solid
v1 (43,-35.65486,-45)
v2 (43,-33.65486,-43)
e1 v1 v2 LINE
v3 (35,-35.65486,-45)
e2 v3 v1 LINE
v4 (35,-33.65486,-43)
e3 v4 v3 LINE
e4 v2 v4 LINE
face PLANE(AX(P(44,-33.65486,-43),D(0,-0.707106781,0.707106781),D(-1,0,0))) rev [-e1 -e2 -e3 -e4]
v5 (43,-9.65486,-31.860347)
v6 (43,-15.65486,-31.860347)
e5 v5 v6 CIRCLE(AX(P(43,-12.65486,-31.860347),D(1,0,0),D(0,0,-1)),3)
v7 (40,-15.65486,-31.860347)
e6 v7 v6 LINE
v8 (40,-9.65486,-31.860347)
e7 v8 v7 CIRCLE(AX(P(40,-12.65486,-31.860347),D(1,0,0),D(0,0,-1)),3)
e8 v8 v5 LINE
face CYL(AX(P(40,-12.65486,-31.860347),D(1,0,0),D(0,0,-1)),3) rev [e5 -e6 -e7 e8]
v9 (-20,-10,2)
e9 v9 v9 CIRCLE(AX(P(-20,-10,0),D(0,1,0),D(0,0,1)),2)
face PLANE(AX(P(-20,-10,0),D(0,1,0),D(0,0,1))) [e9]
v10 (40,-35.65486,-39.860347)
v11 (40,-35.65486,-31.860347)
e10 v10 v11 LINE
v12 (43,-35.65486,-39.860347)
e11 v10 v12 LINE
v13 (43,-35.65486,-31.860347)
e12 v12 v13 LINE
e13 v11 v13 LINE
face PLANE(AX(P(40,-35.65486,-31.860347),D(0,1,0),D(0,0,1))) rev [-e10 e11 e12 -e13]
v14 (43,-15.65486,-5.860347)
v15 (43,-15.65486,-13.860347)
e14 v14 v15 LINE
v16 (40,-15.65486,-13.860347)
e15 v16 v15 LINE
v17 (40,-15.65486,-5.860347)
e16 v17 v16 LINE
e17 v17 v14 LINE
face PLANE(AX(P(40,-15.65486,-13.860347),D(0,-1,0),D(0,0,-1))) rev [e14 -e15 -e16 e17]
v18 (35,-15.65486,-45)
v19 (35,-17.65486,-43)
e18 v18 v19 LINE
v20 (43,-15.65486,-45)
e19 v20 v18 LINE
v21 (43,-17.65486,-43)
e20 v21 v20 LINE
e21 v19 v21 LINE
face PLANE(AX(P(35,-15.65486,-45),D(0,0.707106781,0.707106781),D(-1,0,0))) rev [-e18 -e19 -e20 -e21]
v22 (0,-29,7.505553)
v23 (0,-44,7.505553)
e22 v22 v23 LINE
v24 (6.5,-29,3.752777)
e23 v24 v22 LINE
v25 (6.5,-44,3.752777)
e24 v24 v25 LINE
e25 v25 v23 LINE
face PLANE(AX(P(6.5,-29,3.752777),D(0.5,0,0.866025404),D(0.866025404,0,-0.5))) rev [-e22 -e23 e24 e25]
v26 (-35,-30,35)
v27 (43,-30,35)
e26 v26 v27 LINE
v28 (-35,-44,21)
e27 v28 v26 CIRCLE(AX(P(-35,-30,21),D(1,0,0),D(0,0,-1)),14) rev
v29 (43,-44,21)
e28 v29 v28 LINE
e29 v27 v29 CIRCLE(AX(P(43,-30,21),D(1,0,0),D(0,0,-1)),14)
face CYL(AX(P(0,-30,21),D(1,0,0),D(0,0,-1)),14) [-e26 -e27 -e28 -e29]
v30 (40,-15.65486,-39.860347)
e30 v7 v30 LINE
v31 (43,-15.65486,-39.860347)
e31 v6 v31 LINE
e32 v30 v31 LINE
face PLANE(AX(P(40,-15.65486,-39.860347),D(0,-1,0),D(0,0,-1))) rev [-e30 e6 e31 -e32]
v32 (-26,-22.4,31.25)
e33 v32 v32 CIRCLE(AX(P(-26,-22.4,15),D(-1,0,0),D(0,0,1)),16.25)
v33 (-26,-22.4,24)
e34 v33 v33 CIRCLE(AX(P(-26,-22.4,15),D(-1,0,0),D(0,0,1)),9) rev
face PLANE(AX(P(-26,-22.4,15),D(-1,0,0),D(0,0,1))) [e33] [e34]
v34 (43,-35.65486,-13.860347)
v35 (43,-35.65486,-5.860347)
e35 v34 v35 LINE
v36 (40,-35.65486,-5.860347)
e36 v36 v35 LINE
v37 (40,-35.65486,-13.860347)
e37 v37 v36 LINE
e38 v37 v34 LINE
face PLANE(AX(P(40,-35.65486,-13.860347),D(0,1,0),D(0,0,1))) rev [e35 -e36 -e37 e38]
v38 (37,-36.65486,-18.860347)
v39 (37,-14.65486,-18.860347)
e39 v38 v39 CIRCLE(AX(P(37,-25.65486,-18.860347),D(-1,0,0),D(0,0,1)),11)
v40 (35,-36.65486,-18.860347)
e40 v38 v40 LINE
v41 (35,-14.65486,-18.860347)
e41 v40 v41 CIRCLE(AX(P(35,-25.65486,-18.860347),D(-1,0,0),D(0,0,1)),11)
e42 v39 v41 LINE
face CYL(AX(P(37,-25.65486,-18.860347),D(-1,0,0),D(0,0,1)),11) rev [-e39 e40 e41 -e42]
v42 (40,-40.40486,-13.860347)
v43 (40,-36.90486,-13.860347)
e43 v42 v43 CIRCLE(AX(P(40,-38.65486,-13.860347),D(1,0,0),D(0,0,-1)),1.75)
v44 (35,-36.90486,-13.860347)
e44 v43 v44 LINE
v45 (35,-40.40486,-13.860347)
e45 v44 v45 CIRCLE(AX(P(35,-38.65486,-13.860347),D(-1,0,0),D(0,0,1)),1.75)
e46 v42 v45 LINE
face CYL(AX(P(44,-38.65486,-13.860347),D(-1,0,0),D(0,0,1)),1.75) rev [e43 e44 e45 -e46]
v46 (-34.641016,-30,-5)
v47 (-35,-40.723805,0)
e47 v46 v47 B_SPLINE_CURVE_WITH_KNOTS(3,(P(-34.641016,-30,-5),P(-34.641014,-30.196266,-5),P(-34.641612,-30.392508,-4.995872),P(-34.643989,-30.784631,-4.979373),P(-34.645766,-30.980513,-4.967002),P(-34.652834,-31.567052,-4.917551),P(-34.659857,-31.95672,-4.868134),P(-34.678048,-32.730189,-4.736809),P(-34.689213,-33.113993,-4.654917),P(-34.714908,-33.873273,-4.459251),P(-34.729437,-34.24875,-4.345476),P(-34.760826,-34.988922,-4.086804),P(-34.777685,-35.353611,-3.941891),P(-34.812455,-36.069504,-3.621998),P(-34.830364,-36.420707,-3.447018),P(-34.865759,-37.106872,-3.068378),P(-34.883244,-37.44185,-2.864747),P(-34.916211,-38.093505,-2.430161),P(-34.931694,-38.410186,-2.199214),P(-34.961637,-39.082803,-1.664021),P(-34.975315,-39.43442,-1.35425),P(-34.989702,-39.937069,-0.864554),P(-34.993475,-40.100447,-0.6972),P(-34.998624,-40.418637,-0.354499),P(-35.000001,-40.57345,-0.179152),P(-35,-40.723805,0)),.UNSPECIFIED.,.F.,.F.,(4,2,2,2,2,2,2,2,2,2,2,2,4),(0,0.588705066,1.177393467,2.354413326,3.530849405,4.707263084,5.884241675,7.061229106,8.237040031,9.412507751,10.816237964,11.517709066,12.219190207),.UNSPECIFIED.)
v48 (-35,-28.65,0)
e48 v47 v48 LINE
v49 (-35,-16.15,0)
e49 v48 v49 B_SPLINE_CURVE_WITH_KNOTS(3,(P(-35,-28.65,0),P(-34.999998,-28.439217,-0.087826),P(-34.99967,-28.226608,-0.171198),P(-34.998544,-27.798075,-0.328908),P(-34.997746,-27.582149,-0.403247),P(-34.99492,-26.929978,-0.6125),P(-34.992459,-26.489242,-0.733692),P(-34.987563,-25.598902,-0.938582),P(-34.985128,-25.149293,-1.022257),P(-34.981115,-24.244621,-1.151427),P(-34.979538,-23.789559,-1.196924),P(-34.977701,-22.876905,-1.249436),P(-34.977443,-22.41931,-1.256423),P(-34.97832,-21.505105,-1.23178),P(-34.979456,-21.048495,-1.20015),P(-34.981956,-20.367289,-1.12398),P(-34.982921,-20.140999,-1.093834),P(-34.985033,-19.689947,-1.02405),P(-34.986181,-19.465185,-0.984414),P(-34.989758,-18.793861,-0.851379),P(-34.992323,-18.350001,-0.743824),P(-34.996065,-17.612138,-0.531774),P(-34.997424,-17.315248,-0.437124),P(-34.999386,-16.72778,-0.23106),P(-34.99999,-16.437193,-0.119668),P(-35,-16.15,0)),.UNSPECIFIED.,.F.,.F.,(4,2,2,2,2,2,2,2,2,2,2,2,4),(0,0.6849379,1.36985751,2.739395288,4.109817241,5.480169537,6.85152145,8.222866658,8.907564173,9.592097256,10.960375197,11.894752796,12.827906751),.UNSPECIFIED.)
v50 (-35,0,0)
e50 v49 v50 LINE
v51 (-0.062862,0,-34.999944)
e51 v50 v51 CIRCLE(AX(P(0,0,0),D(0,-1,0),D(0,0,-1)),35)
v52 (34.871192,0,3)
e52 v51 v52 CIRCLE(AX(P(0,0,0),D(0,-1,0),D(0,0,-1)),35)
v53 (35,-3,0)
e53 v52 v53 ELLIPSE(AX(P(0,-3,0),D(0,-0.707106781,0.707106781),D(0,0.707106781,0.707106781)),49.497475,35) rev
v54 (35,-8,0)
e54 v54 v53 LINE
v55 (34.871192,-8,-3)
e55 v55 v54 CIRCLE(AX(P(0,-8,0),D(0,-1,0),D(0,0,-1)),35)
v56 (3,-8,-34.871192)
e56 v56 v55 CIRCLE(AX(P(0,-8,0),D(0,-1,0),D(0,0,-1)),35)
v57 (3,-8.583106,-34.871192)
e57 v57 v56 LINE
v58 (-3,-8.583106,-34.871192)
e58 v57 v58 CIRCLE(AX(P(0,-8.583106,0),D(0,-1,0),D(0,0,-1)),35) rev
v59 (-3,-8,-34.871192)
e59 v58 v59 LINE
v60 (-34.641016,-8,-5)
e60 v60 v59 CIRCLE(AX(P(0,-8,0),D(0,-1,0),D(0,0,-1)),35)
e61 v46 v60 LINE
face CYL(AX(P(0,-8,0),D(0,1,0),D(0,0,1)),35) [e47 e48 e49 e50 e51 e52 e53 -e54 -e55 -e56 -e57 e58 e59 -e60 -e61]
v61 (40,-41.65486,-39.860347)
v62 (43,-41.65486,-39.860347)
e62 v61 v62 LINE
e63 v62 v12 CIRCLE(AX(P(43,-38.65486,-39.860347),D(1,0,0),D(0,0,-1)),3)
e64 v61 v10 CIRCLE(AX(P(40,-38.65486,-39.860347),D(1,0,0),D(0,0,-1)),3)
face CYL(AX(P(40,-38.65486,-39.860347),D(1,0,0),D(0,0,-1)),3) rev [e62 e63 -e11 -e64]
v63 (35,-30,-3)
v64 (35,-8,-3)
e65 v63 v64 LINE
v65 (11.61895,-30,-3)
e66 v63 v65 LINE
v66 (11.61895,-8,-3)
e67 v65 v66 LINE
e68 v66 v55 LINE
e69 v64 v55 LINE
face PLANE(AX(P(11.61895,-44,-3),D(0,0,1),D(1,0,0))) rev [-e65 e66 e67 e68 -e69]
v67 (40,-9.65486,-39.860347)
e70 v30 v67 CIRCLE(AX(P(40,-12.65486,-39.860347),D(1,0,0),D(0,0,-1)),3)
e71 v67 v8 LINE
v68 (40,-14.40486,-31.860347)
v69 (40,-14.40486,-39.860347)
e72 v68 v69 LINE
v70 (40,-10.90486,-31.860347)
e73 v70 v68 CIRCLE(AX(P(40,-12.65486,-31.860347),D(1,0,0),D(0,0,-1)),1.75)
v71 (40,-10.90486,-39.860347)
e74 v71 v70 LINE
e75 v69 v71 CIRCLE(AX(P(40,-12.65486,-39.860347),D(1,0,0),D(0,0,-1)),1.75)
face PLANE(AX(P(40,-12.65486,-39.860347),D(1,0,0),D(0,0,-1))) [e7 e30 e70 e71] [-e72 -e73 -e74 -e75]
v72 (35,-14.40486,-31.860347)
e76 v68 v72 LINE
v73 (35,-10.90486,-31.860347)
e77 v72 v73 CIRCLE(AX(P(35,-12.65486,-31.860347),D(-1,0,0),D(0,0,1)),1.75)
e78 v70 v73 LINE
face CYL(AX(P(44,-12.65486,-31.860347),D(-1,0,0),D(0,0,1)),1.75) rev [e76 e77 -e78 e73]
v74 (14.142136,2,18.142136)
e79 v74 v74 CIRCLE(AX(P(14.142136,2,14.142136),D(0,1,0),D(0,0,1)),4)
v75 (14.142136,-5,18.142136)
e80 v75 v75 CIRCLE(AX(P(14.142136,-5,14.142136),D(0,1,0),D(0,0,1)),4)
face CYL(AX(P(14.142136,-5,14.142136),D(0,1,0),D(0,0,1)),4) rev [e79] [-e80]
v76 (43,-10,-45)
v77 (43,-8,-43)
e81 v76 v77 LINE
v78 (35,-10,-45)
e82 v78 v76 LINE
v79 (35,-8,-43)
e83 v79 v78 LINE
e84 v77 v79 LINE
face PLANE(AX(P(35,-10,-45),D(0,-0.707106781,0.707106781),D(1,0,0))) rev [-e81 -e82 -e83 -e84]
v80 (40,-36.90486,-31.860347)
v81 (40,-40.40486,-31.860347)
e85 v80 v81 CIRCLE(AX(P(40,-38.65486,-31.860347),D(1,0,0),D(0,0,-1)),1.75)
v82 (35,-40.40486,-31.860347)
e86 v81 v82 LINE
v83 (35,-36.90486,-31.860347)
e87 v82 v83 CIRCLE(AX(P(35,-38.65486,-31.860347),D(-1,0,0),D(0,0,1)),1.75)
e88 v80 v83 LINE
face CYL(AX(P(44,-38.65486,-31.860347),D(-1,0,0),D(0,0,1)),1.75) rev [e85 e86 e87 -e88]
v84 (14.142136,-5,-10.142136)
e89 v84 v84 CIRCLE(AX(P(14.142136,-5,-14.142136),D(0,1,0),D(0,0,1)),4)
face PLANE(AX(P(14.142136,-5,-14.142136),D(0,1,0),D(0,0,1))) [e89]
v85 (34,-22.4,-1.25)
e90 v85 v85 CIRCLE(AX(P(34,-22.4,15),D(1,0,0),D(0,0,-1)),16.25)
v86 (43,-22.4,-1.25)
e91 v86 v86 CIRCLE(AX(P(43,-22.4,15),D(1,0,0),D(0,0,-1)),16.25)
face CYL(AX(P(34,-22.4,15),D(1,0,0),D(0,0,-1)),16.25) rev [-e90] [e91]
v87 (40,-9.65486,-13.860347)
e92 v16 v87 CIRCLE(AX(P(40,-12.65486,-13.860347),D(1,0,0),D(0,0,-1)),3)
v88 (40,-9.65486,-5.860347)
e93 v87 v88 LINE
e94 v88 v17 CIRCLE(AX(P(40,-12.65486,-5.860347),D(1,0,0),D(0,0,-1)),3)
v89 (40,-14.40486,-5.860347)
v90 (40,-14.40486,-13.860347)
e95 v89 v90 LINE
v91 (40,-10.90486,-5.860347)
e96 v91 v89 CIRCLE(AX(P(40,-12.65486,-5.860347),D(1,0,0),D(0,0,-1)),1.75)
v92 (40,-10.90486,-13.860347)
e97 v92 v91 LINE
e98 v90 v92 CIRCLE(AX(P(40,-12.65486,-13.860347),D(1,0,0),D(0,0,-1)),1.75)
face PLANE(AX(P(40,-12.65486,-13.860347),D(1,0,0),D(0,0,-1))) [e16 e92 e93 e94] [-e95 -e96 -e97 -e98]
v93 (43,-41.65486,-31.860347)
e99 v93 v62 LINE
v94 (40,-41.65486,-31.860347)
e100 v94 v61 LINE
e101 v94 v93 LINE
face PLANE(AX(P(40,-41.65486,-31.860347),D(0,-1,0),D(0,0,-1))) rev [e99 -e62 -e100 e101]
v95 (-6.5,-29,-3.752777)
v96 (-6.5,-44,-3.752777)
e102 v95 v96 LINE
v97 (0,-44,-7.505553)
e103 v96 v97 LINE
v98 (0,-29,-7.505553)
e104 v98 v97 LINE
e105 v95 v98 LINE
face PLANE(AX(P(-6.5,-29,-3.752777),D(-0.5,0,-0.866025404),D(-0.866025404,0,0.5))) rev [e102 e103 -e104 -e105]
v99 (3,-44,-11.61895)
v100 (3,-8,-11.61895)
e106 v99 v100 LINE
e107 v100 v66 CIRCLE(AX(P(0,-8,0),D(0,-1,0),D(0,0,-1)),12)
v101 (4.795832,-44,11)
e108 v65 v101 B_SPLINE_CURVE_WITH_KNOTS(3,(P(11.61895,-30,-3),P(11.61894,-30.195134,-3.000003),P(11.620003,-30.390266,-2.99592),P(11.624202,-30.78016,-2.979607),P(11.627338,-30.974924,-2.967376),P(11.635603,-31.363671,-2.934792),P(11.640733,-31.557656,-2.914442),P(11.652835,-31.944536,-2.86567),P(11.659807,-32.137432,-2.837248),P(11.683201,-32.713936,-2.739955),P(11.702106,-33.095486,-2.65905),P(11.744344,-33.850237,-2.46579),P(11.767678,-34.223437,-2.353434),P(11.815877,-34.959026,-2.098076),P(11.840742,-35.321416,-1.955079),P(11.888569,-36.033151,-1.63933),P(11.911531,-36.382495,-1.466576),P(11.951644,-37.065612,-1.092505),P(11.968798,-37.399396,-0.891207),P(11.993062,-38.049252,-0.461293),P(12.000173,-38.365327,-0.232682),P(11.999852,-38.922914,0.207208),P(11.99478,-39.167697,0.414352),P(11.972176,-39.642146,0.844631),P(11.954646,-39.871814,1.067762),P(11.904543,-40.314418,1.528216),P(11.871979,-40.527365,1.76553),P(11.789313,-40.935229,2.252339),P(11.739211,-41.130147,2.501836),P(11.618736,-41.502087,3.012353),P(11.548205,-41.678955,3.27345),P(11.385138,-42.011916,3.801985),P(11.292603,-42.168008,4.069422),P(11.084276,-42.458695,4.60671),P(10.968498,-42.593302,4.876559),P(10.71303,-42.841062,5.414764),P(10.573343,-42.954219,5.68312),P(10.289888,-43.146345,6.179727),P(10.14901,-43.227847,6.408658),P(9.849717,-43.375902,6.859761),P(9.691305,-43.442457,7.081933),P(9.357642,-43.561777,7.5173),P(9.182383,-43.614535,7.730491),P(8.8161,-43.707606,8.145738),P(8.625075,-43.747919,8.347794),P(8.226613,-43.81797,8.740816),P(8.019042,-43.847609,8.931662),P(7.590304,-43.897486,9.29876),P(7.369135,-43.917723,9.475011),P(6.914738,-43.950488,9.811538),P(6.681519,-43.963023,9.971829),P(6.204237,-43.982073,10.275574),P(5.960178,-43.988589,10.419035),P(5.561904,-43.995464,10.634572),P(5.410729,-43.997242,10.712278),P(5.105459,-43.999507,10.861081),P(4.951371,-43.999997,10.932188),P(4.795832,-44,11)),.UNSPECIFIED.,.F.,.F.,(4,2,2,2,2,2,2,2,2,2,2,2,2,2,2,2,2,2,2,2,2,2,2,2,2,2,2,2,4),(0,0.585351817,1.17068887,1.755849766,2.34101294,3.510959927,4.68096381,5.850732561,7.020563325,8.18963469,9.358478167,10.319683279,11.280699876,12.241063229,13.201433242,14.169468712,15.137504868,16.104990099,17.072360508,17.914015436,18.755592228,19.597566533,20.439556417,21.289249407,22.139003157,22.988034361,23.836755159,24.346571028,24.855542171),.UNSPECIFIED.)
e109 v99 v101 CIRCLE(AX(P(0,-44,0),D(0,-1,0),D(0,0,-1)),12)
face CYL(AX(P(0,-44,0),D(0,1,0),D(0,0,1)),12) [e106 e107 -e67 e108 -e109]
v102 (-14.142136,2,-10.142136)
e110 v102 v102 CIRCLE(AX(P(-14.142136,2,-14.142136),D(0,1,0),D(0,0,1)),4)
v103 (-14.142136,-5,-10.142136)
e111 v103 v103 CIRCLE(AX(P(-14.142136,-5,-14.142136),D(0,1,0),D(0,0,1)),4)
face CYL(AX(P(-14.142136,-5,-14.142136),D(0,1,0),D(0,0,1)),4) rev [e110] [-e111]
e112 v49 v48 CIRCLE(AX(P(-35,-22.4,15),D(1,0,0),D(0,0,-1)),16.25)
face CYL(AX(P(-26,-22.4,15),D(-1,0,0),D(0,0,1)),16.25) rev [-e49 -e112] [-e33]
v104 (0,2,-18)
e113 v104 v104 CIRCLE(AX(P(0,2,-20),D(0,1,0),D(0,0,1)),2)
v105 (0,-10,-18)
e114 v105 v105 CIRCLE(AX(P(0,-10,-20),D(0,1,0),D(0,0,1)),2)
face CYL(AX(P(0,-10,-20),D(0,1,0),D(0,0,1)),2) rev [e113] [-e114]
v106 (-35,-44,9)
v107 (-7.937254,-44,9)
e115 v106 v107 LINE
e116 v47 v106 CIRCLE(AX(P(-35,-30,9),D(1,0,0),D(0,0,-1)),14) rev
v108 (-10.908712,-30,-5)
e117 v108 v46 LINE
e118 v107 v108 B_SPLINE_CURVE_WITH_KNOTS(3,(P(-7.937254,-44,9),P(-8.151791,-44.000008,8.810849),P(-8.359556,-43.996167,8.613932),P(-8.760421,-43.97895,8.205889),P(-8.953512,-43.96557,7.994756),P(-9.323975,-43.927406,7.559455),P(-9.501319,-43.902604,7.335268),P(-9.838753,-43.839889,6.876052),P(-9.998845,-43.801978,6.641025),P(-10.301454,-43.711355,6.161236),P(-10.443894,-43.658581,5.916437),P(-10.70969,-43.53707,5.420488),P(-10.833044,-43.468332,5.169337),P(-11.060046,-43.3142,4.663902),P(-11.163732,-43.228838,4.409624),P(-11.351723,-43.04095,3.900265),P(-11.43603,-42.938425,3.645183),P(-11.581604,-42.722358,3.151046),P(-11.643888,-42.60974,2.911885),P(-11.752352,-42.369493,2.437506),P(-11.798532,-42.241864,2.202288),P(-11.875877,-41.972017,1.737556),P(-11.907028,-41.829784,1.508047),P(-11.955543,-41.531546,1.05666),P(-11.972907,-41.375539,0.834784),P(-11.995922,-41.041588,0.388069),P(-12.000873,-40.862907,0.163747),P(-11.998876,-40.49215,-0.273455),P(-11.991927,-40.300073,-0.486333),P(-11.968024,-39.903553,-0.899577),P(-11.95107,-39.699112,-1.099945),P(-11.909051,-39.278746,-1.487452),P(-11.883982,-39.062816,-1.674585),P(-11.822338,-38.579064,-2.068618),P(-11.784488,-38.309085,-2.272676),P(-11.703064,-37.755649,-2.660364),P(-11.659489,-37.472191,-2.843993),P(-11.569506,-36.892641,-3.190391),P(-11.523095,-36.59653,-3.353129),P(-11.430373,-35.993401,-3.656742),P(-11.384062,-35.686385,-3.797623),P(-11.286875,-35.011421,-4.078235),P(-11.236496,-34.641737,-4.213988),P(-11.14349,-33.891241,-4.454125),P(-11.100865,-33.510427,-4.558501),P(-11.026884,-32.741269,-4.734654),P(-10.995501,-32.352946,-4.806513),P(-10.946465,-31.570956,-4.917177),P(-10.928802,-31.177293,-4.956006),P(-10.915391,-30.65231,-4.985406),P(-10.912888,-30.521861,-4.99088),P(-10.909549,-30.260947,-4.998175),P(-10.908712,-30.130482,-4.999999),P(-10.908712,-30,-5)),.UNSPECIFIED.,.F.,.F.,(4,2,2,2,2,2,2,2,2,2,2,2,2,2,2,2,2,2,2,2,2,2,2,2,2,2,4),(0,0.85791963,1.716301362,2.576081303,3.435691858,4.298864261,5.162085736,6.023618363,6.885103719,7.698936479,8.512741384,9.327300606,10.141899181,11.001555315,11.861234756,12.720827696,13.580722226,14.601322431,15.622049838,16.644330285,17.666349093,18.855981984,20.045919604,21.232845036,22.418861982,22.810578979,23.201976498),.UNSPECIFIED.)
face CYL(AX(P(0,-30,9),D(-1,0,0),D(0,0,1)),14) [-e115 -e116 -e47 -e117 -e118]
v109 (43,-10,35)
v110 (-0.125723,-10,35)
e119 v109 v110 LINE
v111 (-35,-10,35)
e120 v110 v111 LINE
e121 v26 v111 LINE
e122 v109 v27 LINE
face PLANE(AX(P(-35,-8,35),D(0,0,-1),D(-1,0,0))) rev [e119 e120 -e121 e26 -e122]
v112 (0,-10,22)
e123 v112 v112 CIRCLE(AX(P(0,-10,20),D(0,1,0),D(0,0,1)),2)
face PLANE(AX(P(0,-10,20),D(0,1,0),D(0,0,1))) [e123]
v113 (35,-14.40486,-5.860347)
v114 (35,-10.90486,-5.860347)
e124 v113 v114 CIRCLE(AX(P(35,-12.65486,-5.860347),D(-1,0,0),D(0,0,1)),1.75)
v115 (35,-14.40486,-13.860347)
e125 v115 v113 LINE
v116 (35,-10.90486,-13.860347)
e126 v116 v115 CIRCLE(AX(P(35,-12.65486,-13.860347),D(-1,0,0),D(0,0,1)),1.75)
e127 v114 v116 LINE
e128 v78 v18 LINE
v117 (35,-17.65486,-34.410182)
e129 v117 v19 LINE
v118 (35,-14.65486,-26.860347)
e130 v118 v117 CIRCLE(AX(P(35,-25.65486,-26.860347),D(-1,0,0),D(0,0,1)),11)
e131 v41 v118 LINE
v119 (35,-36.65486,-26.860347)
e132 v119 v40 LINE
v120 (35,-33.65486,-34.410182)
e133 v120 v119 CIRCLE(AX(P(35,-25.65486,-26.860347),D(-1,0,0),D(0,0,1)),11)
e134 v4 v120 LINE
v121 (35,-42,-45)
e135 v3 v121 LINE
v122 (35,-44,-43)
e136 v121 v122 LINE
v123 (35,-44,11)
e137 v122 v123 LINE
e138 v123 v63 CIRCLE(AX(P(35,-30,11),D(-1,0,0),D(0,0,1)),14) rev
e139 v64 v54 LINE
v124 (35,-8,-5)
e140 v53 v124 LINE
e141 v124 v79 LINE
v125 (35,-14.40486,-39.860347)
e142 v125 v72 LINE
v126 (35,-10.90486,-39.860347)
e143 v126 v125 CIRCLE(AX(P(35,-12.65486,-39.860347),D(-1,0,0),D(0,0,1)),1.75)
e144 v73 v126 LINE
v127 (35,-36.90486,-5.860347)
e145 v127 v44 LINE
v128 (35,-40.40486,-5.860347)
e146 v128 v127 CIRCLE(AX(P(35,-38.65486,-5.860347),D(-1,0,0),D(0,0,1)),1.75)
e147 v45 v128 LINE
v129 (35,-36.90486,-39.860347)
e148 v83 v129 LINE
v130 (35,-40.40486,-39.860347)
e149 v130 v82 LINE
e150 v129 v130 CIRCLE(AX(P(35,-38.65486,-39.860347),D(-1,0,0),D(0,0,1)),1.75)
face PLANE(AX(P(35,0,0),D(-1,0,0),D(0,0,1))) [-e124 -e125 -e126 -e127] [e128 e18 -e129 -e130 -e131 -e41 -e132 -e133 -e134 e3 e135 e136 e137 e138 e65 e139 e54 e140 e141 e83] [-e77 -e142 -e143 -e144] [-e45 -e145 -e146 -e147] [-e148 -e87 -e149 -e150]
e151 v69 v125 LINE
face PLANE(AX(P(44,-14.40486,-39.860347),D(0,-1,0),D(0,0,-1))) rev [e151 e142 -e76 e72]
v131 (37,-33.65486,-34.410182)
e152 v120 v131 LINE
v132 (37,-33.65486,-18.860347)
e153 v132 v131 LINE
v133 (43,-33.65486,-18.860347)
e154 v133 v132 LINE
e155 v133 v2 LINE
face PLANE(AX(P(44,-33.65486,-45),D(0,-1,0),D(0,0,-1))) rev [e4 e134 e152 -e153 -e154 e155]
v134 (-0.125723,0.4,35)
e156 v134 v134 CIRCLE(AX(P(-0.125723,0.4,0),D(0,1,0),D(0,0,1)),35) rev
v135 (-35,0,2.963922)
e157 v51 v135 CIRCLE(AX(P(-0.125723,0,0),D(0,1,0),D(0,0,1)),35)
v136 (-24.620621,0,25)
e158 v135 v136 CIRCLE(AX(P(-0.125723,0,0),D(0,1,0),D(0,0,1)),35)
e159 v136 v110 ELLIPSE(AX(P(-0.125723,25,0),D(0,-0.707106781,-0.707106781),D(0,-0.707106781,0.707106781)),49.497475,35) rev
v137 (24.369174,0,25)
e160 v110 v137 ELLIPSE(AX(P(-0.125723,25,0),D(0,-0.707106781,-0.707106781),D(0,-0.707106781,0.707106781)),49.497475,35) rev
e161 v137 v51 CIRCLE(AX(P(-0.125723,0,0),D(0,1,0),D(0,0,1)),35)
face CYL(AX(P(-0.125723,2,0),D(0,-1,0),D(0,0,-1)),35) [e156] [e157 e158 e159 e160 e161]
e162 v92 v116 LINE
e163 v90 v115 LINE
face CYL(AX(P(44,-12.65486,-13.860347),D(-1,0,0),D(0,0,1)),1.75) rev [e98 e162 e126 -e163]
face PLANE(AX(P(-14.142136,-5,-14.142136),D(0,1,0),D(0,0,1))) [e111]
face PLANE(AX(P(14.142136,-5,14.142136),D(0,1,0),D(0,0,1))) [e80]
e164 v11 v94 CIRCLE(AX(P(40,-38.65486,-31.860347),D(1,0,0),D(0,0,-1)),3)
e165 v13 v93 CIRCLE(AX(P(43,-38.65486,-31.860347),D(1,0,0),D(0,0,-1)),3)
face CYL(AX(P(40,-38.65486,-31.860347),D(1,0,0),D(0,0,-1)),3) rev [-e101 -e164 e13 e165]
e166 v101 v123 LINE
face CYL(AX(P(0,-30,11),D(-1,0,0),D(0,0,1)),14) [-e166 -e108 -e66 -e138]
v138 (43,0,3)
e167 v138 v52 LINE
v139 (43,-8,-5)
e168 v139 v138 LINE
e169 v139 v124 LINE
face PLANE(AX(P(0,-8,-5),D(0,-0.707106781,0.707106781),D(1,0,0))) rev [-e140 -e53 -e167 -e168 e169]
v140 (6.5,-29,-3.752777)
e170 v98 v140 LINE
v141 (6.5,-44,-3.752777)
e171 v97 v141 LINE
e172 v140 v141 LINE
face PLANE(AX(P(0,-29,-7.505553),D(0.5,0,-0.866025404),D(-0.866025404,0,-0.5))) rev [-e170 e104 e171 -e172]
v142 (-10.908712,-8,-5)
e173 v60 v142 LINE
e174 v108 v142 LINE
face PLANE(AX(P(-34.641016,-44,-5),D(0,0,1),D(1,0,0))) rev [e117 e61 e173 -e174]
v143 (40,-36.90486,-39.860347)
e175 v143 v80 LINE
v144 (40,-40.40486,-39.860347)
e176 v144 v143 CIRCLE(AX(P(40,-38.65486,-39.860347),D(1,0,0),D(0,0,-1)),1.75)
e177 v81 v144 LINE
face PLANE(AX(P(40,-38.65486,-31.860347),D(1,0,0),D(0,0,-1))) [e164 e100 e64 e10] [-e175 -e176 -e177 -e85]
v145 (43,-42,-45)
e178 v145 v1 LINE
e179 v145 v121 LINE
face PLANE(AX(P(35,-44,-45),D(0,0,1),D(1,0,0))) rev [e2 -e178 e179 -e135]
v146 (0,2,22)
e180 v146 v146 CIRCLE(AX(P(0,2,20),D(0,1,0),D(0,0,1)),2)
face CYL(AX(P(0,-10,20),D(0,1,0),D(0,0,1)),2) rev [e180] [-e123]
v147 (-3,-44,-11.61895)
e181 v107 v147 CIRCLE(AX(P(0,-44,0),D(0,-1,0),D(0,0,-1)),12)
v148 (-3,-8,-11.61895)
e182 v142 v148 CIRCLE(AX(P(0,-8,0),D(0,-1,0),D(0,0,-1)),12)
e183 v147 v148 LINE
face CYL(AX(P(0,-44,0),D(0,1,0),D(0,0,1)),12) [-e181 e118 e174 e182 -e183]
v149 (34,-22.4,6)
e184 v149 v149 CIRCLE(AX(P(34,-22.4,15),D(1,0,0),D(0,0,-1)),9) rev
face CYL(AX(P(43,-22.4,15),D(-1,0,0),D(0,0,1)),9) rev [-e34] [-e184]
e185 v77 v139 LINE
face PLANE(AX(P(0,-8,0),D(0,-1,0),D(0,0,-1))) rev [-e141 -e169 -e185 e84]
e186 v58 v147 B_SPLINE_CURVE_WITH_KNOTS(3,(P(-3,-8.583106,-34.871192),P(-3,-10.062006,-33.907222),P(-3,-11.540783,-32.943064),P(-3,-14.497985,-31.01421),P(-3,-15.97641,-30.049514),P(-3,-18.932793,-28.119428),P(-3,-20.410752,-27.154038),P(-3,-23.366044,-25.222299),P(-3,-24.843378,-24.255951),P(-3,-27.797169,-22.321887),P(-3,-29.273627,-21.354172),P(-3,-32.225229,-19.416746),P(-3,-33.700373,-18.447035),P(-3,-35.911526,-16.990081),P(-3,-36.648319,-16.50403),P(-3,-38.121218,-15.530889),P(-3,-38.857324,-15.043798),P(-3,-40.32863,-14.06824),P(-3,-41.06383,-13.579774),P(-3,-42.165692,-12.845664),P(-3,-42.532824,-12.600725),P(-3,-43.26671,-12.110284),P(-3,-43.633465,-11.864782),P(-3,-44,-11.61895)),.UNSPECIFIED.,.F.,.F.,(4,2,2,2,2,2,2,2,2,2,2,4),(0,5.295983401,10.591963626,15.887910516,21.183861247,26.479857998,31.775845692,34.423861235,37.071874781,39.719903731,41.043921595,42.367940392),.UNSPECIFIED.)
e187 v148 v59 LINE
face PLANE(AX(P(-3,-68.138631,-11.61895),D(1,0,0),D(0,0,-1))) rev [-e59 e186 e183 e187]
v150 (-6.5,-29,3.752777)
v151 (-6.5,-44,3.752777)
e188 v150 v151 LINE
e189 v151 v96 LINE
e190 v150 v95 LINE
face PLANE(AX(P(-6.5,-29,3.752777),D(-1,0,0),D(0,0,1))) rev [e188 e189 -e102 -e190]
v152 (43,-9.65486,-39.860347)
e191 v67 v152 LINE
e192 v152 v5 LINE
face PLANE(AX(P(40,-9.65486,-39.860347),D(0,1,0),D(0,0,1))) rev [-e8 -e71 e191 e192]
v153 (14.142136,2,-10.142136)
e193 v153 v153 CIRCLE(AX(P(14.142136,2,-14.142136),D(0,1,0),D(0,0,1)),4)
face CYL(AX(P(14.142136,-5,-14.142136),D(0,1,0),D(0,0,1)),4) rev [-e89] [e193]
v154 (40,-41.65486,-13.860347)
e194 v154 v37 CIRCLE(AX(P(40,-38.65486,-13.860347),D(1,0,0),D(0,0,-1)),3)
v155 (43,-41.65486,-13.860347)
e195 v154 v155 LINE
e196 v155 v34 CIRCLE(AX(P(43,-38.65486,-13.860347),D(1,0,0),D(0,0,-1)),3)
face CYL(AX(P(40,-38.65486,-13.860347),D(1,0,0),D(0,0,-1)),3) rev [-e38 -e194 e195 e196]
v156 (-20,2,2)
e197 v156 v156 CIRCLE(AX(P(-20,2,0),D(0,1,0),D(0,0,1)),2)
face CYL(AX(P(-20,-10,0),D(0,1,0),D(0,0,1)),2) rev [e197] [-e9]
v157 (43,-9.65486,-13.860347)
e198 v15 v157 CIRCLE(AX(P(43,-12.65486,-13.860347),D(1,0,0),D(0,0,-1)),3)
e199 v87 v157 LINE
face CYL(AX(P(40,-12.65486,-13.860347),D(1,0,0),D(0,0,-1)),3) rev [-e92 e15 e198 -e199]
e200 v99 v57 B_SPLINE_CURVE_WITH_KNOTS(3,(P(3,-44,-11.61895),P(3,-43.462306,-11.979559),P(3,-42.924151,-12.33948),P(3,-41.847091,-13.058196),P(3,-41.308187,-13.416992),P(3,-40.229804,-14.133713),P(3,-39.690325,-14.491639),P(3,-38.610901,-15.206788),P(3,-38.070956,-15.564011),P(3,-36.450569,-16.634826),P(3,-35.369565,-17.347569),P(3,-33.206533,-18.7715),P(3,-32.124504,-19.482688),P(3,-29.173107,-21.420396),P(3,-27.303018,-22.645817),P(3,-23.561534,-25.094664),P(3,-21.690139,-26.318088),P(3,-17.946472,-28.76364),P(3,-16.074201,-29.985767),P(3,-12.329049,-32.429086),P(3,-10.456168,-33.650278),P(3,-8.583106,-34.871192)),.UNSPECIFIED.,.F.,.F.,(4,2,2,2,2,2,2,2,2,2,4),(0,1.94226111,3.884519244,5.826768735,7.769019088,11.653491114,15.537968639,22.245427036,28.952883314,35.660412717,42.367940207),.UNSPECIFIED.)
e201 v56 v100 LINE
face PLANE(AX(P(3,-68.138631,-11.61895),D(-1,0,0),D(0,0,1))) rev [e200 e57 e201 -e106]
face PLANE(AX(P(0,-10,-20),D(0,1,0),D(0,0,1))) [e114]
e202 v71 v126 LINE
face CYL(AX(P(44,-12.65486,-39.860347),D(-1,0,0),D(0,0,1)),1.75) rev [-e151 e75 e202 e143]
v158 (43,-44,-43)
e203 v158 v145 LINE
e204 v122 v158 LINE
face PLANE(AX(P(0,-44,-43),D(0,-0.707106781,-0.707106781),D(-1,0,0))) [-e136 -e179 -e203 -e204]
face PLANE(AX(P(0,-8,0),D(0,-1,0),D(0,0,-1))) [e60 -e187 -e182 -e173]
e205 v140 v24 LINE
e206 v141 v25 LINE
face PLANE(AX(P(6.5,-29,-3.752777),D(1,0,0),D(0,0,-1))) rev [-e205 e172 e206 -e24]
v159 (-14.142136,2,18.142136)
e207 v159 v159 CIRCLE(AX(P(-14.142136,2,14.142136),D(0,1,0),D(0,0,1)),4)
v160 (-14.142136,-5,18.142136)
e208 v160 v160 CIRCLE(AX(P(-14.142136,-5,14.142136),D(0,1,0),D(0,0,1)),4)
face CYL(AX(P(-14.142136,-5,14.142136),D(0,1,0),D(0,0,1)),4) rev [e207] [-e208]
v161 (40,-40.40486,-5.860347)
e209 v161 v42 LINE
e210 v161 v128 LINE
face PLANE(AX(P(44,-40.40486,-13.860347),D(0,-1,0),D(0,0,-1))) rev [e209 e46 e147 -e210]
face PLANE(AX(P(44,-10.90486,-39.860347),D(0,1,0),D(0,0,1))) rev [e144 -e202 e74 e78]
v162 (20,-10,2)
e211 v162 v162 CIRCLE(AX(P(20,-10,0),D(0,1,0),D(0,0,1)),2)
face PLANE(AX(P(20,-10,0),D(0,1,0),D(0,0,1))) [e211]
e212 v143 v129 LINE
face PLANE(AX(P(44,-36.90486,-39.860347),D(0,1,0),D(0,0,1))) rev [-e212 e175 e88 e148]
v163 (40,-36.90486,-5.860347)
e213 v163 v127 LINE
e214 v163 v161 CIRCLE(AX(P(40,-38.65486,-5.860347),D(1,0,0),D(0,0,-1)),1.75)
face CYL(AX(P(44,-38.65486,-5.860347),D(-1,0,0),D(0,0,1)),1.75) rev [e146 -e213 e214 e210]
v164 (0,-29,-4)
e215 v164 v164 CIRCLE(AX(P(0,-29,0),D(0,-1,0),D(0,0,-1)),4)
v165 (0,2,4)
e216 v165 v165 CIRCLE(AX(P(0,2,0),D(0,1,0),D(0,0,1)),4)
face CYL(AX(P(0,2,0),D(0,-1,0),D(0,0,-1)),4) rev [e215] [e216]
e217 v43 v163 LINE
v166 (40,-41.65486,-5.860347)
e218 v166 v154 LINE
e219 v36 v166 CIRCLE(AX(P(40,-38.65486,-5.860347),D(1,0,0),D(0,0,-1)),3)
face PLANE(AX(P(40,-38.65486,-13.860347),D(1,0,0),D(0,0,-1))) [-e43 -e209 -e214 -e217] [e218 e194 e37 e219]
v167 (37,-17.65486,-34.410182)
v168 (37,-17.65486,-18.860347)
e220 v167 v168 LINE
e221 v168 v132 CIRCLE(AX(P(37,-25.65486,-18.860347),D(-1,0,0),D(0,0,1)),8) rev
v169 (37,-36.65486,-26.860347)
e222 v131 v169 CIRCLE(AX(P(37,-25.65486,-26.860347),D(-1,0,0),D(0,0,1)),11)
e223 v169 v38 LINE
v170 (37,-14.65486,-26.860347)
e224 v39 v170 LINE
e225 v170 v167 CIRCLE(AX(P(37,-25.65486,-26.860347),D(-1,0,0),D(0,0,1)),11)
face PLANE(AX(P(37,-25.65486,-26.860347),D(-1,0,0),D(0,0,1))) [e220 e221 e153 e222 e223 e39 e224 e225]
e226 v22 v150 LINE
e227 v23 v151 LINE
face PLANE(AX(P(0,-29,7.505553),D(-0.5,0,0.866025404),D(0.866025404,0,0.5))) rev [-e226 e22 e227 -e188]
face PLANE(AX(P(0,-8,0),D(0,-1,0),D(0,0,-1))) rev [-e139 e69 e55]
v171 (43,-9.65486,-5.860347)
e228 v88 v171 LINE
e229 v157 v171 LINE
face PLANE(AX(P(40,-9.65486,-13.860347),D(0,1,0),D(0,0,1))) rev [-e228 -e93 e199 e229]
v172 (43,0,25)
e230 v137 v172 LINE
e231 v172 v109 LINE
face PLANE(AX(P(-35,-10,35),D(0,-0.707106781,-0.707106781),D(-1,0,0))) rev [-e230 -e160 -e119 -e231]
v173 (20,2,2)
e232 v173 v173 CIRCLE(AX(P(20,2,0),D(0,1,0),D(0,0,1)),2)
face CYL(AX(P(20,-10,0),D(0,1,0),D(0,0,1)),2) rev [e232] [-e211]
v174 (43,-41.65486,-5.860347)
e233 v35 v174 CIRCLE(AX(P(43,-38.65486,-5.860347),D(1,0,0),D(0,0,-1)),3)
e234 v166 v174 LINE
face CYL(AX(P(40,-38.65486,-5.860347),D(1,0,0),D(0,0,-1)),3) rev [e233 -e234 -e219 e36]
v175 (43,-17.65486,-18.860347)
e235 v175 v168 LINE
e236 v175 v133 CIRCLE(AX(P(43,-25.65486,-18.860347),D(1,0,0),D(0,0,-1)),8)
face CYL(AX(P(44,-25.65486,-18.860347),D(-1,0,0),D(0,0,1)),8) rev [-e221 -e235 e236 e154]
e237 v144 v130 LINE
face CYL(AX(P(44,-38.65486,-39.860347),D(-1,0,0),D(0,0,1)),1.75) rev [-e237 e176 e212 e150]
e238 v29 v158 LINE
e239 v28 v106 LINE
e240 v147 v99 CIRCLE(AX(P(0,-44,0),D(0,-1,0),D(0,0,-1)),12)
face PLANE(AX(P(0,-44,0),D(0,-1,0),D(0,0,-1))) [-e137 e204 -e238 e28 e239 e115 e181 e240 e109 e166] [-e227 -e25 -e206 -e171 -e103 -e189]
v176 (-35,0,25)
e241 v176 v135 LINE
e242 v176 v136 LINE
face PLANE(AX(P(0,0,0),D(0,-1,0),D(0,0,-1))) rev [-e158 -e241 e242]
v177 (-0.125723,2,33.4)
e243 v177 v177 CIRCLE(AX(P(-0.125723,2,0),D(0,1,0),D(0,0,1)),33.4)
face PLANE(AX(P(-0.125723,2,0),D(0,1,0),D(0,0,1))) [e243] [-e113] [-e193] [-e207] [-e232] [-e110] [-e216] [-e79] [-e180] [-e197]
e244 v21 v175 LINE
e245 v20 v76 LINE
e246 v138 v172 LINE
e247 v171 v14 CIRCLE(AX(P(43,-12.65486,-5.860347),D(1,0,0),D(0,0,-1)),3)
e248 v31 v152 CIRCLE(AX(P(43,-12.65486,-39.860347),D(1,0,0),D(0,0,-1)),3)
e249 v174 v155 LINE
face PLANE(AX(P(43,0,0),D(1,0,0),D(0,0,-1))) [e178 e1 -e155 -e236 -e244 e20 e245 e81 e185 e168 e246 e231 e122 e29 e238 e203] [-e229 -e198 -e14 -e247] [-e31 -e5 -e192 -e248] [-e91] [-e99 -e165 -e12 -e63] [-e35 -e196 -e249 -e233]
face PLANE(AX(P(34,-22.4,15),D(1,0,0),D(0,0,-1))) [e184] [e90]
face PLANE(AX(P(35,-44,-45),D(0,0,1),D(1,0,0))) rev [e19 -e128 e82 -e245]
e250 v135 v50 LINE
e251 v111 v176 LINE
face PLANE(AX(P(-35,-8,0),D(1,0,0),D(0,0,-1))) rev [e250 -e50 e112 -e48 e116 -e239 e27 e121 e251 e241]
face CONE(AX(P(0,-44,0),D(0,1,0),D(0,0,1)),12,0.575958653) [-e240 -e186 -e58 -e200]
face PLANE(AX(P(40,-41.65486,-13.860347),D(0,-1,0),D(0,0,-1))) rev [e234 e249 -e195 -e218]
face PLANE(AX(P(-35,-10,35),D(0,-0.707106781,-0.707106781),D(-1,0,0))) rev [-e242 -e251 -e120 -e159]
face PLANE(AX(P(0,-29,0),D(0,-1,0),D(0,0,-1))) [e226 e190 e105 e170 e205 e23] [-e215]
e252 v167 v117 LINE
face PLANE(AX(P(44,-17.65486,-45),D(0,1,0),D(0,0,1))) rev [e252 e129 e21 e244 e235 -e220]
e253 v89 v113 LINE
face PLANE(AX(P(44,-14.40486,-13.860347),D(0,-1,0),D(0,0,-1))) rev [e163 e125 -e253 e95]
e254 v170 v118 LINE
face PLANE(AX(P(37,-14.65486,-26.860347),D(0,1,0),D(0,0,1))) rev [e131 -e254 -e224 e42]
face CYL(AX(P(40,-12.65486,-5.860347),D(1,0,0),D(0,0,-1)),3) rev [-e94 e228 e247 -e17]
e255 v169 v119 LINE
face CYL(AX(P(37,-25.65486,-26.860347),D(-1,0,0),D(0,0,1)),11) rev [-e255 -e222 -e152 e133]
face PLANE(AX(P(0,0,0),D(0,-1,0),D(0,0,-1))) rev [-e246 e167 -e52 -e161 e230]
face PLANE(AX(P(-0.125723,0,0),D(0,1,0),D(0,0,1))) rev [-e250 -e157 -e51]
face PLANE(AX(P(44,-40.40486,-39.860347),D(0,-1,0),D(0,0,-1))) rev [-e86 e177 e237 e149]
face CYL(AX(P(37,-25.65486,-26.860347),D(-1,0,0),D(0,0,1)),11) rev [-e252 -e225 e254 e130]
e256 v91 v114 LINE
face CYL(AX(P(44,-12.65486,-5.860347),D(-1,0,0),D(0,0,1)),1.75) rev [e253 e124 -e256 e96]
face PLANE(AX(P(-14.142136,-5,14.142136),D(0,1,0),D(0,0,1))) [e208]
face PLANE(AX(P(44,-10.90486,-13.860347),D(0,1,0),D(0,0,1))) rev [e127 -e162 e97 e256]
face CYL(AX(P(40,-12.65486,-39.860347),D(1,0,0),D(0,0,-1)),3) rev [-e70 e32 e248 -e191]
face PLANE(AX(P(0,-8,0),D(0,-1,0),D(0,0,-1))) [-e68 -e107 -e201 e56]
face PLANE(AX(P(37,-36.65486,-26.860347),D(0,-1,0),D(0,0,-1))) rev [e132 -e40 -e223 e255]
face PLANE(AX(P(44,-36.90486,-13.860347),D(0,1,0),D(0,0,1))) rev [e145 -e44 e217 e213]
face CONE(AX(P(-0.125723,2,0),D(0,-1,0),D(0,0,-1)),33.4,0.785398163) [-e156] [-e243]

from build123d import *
from build123d.topology import SkipClean

# Parameters (mm, degrees)
SKETCH1_R           = 35.00000000000001
SKETCH1_R_2         = 4
BOSS_EXTRUDE1_DEPTH = 2
CHAMFER1_SIZE       = 1.6
BOSS_EXTRUDE2_START = 8
SKETCH2_R           = 4
BOSS_EXTRUDE2_DEPTH = 8
BOSS_EXTRUDE3_START = 36
SKETCH3_R           = 3.999999999999999
BOSS_EXTRUDE3_DEPTH = 36
BOSS_EXTRUDE4_DEPTH = 8
CUT_EXTRUDE1_DEPTH  = 8
SKETCH6_R           = 9
CUT_EXTRUDE2_DEPTH  = 101.22474744293447
SKETCH7_R           = 16.25
CUT_EXTRUDE3_DEPTH  = 9
CUT_EXTRUDE4_START  = -9
SKETCH8_R           = 16.25
CUT_EXTRUDE4_DEPTH  = 9
CHAMFER2_SIZE       = 10
FILLET1_R           = 14
FILLET2_R           = 14
CUT_EXTRUDE5_DEPTH  = 9
CUT_EXTRUDE6_DEPTH  = 9
CHAMFER3_SIZE       = 2
CUT_EXTRUDE7_START  = -3
CUT_EXTRUDE7_DEPTH  = 3
BOSS_EXTRUDE5_START = 36
BOSS_EXTRUDE5_DEPTH = 36
CHAMFER4_SIZE       = 23
CHAMFER4_SIZE2      = 35.41689416773558
SKETCH13_R          = 2.0000000000000004
CUT_EXTRUDE8_DEPTH  = 12
SKETCH14_R          = 4.000000000000001
SKETCH14_R_2        = 4.000000000000002
CUT_EXTRUDE9_DEPTH  = 7
CUT_EXTRUDE10_DEPTH = 15
SKETCH16_W          = 8
SKETCH16_H          = 8
BOSS_EXTRUDE6_DEPTH = 5
CHAMFER5_SIZE       = 8
CUT_EXTRUDE11_DEPTH = 2


with BuildPart() as part:
    # Sketch1 → Boss-Extrude1 (new body)
    with BuildSketch(Plane(origin=(0, 0, 0), x_dir=(1, 0, 0), z_dir=(0, 1, 0))):
        with Locations(Location((-0.12572339457591175, 0, 0), (0, 0, 270))):
            Circle(SKETCH1_R)
        with Locations(Location((0, 0, 0), (0, 0, 270))):
            Circle(SKETCH1_R_2, mode=Mode.SUBTRACT)
    extrude(amount=BOSS_EXTRUDE1_DEPTH)

    # Chamfer1
    chamfer1_edges = [part.edges().sort_by_distance(p)[0] for p in [
        (-0.12572339457590104, 2, -35.00000000000001),
    ]]
    chamfer(chamfer1_edges, length=CHAMFER1_SIZE)

    # Sketch2 → Boss-Extrude2 (add)
    with SkipClean():  # the faces are left unmerged after this step: merging them gives an invalid solid
        with BuildSketch(Plane.XZ.offset(BOSS_EXTRUDE2_START)):
            with BuildLine():
                Line((-35.00000000000001, 0), (-35.00000000000001, 35.00000000000001))
                Line((-35.00000000000001, 35.00000000000001), (35.00000000000001, 35.00000000000001))
                Line((35.00000000000001, 35.00000000000001), (35.00000000000001, 0))
                ThreePointArc((35.00000000000001, 0), (-6.43e-15, -35.00000000000001), (-35.00000000000001, 0))
            make_face()
            with Locations(Location((0, 0, 0), (0, 0, 270))):
                Circle(SKETCH2_R, mode=Mode.SUBTRACT)
        extrude(amount=-BOSS_EXTRUDE2_DEPTH)

    # Sketch3 → Boss-Extrude3 (add)
    with SkipClean():  # the faces are left unmerged after this step: merging them gives an invalid solid
        with BuildSketch(Plane.XZ.offset(8).offset(BOSS_EXTRUDE3_START)):
            with BuildLine():
                Line((-35.000000000000014, -2.4286e-13), (-35.000000000000014, 35))
                Line((-35.000000000000014, 35), (35.000000000000014, 35))
                Line((35.000000000000014, 35), (35.00000000000003, -44.999999999999986))
                Line((35.00000000000003, -44.999999999999986), (27.000000000000032, -44.999999999999986))
                Line((27.000000000000032, -44.999999999999986), (27.000000000000032, -2.9999999999999956))
                Line((27.000000000000032, -2.9999999999999956), (11.618950038622254, -2.9999999999999956))
                ThreePointArc((11.618950038622254, -2.9999999999999956), (1.0611830554466926, -11.952986677932541), (-10.908712114635716, -4.999999999999997))
                Line((-10.908712114635716, -4.999999999999997), (-34.64101615137756, -4.999999999999997))
                ThreePointArc((-34.64101615137756, -4.999999999999997), (-34.910138679889364, -2.5064351878501627), (-35.000000000000014, -2.4286e-13))
            make_face()
            with Locations(Location((0, 0, 0), (0, 0, 270))):
                Circle(SKETCH3_R, mode=Mode.SUBTRACT)
        extrude(amount=-BOSS_EXTRUDE3_DEPTH)

    # Sketch4 → Boss-Extrude4 (add)
    with SkipClean():  # the faces are left unmerged after this step: merging them gives an invalid solid
        with BuildSketch(Plane(origin=(35.00000000000001, 0, 0), x_dir=(0, 0, -1), z_dir=(1, 0, 0))):
            Polygon((0, 0), (-35.00000000000001, 0), (-35, -44), (44.999999999999986, -44), (44.999999999999986, -8), (0, -8), align=None)
        extrude(amount=BOSS_EXTRUDE4_DEPTH)

    # Sketch5 → Cut-Extrude1 (cut)
    with SkipClean():  # the faces are left unmerged after this step: merging them gives an invalid solid
        with BuildSketch(Plane.ZY.offset(-27.000000000000032)):
            Polygon((-2.9999999999999956, -8), (-22.271057451320065, -8), (-44.999999999999986, -8), (-44.999999999999986, -44), (-2.9999999999999956, -44), align=None)
        extrude(amount=-CUT_EXTRUDE1_DEPTH, mode=Mode.SUBTRACT)

    # Sketch6 → Cut-Extrude2 (cut, through all)
    with SkipClean():  # the faces are left unmerged after this step: merging them gives an invalid solid
        with BuildSketch(Plane.ZY.offset(35.00000000000001)):
            with Locations((15.000000000000004, -22.399999999999995)):
                Circle(SKETCH6_R)
        extrude(amount=-CUT_EXTRUDE2_DEPTH, mode=Mode.SUBTRACT)

    # Sketch7 → Cut-Extrude3 (cut)
    with SkipClean():  # the faces are left unmerged after this step: merging them gives an invalid solid
        with BuildSketch(Plane(origin=(43.00000000000001, 0, 0), x_dir=(0, 0, -1), z_dir=(1, 0, 0))):
            with Locations((-15.000000000000004, -22.399999999999995)):
                Circle(SKETCH7_R)
        extrude(amount=-CUT_EXTRUDE3_DEPTH, mode=Mode.SUBTRACT)

    # Sketch8 → Cut-Extrude4 (cut)
    with SkipClean():  # the faces are left unmerged after this step: merging them gives an invalid solid
        with BuildSketch(Plane.ZY.offset(35.00000000000001).offset(CUT_EXTRUDE4_START)):
            with Locations(Location((15.000000000000004, -22.399999999999995, 0), (0, 0, 180))):
                Circle(SKETCH8_R)
        extrude(amount=CUT_EXTRUDE4_DEPTH, mode=Mode.SUBTRACT)

    # Chamfer2
    # the kernel refuses this chamfer: 10 mm, written as the material it takes off along each edge
    with BuildSketch(Plane(origin=(-0.12572339457592108, 0, 35.00000000000001), x_dir=(0, 0.027495876610586372, -0.9996219169112968), z_dir=(1, 0, 0))) as chamfer2_piece_1_section:
        Polygon((CHAMFER2_SIZE * 0.999621916911, -CHAMFER2_SIZE * 0.0274958766106), (-CHAMFER2_SIZE * 0.0274958766106, -CHAMFER2_SIZE * 0.999621916911), (0, 0), align=None)
    chamfer2_piece_1 = extrude(amount=35.12572339457593, mode=Mode.PRIVATE)
    chamfer2_piece_1 = chamfer2_piece_1 - Plane(origin=(-0.12572339457591175, -3.623493545412481, 0), x_dir=(-1.8e-16, 0, 1), z_dir=(0, -1, 0)) * Cylinder(35.00000000000001, 111, mode=Mode.PRIVATE)
    add(chamfer2_piece_1, mode=Mode.SUBTRACT)
    with BuildSketch(Plane(origin=(-60.716829879659116, 0, 35.00000000000001), x_dir=(0, 0.027495876610586372, -0.9996219169112968), z_dir=(1, 0, 0))) as chamfer2_piece_2_section:
        Polygon((CHAMFER2_SIZE * 0.999621916911, -CHAMFER2_SIZE * 0.0274958766106), (-CHAMFER2_SIZE * 0.0274958766106, -CHAMFER2_SIZE * 0.999621916911), (0, 0), align=None)
    chamfer2_piece_2 = extrude(amount=60.591106485083195, mode=Mode.PRIVATE)
    chamfer2_piece_2 = chamfer2_piece_2 - Plane(origin=(-0.12572339457591175, -3.626934309923686, 0), x_dir=(-1.8e-16, 0, 1), z_dir=(0, -1, 0)) * Cylinder(35.00000000000001, 162, mode=Mode.PRIVATE)
    add(chamfer2_piece_2, mode=Mode.SUBTRACT)
    with BuildSketch(Plane(origin=(35.00000000000001, 0, 35.00000000000001), x_dir=(0, 0.027495876610586372, -0.9996219169112968), z_dir=(1, 0, 0))) as chamfer2_piece_3:
        Polygon((CHAMFER2_SIZE * 0.999621916911, -CHAMFER2_SIZE * 0.0274958766106), (-CHAMFER2_SIZE * 0.0274958766106, -CHAMFER2_SIZE * 0.999621916911), (0, 0), align=None)
    extrude(amount=33.71682987965911, mode=Mode.SUBTRACT)

    # Fillet1
    fillet1_edges = [part.edges().sort_by_distance(p)[0] for p in [
        (4, -44, 35),
        (-22.774864133006638, -44, -4.999999999999997),
    ]]
    fillet(fillet1_edges, radius=FILLET1_R)

    # Fillet2
    fillet2_edges = [part.edges().sort_by_distance(p)[0] for p in [
        (23.309475019311144, -44, -2.9999999999999956),
    ]]
    fillet(fillet2_edges, radius=FILLET2_R)

    # Sketch9 → Cut-Extrude5 (cut)
    with BuildSketch(Plane.ZY.offset(-35.00000000000003)):
        with BuildLine():
            Line((-44.999999999999986, -33.65486047203874), (-44.999999999999986, -17.65486047203874))
            Line((-44.999999999999986, -17.65486047203874), (-18.86034711023605, -17.654860472038735))
            ThreePointArc((-18.86034711023605, -17.654860472038735), (-10.860347110236049, -25.654860472038735), (-18.86034711023605, -33.654860472038735))
            Line((-18.86034711023605, -33.654860472038735), (-44.999999999999986, -33.65486047203874))
        make_face()
    extrude(amount=-CUT_EXTRUDE5_DEPTH, mode=Mode.SUBTRACT)

    # Sketch10 → Cut-Extrude6 (cut)
    with BuildSketch(Plane.ZY.offset(-35.00000000000003)):
        with BuildLine():
            Line((-39.86034711023605, -10.904860472038738), (-31.860347110236052, -10.904860472038736))
            ThreePointArc((-31.860347110236052, -10.904860472038736), (-30.110347110236052, -12.654860472038736), (-31.860347110236052, -14.404860472038736))
            Line((-31.860347110236052, -14.404860472038736), (-39.86034711023605, -14.404860472038738))
            ThreePointArc((-39.86034711023605, -14.404860472038738), (-41.61034711023605, -12.654860472038738), (-39.86034711023605, -10.904860472038738))
        make_face()
        with BuildLine():
            Line((-39.86034711023605, -36.90486047203874), (-31.860347110236038, -36.90486047203874))
            ThreePointArc((-31.860347110236038, -36.90486047203874), (-30.110347110236052, -38.65486047203874), (-31.860347110236038, -40.40486047203874))
            Line((-31.860347110236038, -40.40486047203874), (-39.86034711023605, -40.40486047203874))
            ThreePointArc((-39.86034711023605, -40.40486047203874), (-41.61034711023605, -38.65486047203874), (-39.86034711023605, -36.90486047203874))
        make_face()
        with BuildLine():
            Line((-13.86034711023605, -10.904860472038738), (-5.86034711023605, -10.904860472038736))
            ThreePointArc((-5.86034711023605, -10.904860472038736), (-4.110347110236053, -12.654860472038736), (-5.86034711023605, -14.404860472038736))
            Line((-5.86034711023605, -14.404860472038736), (-13.86034711023605, -14.404860472038738))
            ThreePointArc((-13.86034711023605, -14.404860472038738), (-15.610347110236054, -12.654860472038738), (-13.86034711023605, -10.904860472038738))
        make_face()
        with BuildLine():
            Line((-13.860347110236047, -36.904860472038735), (-5.860347110236046, -36.904860472038735))
            ThreePointArc((-5.860347110236046, -36.904860472038735), (-4.110347110236057, -38.65486047203874), (-5.860347110236046, -40.404860472038735))
            Line((-5.860347110236046, -40.404860472038735), (-13.860347110236047, -40.404860472038735))
            ThreePointArc((-13.860347110236047, -40.404860472038735), (-15.610347110236058, -38.65486047203874), (-13.860347110236047, -36.904860472038735))
        make_face()
    extrude(amount=-CUT_EXTRUDE6_DEPTH, mode=Mode.SUBTRACT)

    # Chamfer3
    chamfer3_edges = [part.edges().sort_by_distance(p)[0] for p in [
        (39.000000000000014, -17.65486047203874, -44.999999999999986),
        (39.000000000000014, -33.65486047203874, -44.999999999999986),
        (39.00000000000001, -8, -44.999999999999986),
        (39.00000000000001, -44, -44.999999999999986),
    ]]
    chamfer(chamfer3_edges, length=CHAMFER3_SIZE)

    # Sketch11 → Cut-Extrude7 (cut)
    # profile 1 of 4: a face of its own
    with BuildSketch(Plane(origin=(43.00000000000001, 0, 0), x_dir=(0, 0, -1), z_dir=(1, 0, 0)).offset(CUT_EXTRUDE7_START)):
        with BuildLine():
            Line((13.860347110236054, -15.654860472038738), (5.860347110236053, -15.654860472038738))
            ThreePointArc((5.860347110236053, -15.654860472038738), (2.8603471102360567, -12.654860472038736), (5.860347110236053, -9.65486047203874))
            Line((5.860347110236053, -9.65486047203874), (13.860347110236054, -9.65486047203874))
            ThreePointArc((13.860347110236054, -9.65486047203874), (16.860347110236056, -12.654860472038738), (13.860347110236054, -15.654860472038738))
        make_face()
        with BuildLine():
            Line((13.86034711023605, -10.904860472038738), (5.86034711023605, -10.904860472038736))
            ThreePointArc((5.86034711023605, -10.904860472038736), (4.110347110236053, -12.654860472038736), (5.8603471102360505, -14.404860472038736))
            Line((5.8603471102360505, -14.404860472038736), (13.86034711023605, -14.404860472038738))
            ThreePointArc((13.86034711023605, -14.404860472038738), (15.610347110236054, -12.654860472038738), (13.86034711023605, -10.904860472038738))
        make_face(mode=Mode.SUBTRACT)
    # profile 2 of 4: a face of its own
    with BuildSketch(Plane(origin=(43.00000000000001, 0, 0), x_dir=(0, 0, -1), z_dir=(1, 0, 0)).offset(CUT_EXTRUDE7_START)):
        with BuildLine():
            Line((39.86034711023605, -15.654860472038738), (31.860347110236052, -15.654860472038738))
            ThreePointArc((31.860347110236052, -15.654860472038738), (28.860347110236056, -12.654860472038736), (31.860347110236052, -9.65486047203874))
            Line((31.860347110236052, -9.65486047203874), (39.86034711023605, -9.65486047203874))
            ThreePointArc((39.86034711023605, -9.65486047203874), (42.86034711023605, -12.654860472038738), (39.86034711023605, -15.654860472038738))
        make_face()
        with BuildLine():
            Line((31.860347110236052, -14.404860472038736), (39.86034711023605, -14.404860472038738))
            ThreePointArc((39.86034711023605, -14.404860472038738), (41.61034711023605, -12.654860472038738), (39.86034711023605, -10.904860472038738))
            Line((39.86034711023605, -10.904860472038738), (31.860347110236052, -10.904860472038736))
            ThreePointArc((31.860347110236052, -10.904860472038736), (30.110347110236052, -12.654860472038736), (31.860347110236052, -14.404860472038736))
        make_face(mode=Mode.SUBTRACT)
    # profile 3 of 4: a face of its own
    with BuildSketch(Plane(origin=(43.00000000000001, 0, 0), x_dir=(0, 0, -1), z_dir=(1, 0, 0)).offset(CUT_EXTRUDE7_START)):
        with BuildLine():
            Line((13.86034711023605, -41.65486047203874), (5.86034711023605, -41.65486047203874))
            ThreePointArc((5.86034711023605, -41.65486047203874), (2.8603471102360425, -38.65486047203874), (5.86034711023605, -35.654860472038735))
            Line((5.86034711023605, -35.654860472038735), (13.86034711023605, -35.654860472038735))
            ThreePointArc((13.86034711023605, -35.654860472038735), (16.86034711023605, -38.65486047203874), (13.86034711023605, -41.65486047203874))
        make_face()
        with BuildLine():
            Line((5.860347110236047, -40.404860472038735), (13.860347110236047, -40.404860472038735))
            ThreePointArc((13.860347110236047, -40.404860472038735), (15.610347110236043, -38.65486047203874), (13.860347110236047, -36.904860472038735))
            Line((13.860347110236047, -36.904860472038735), (5.860347110236046, -36.904860472038735))
            ThreePointArc((5.860347110236046, -36.904860472038735), (4.1103471102360425, -38.65486047203874), (5.860347110236047, -40.404860472038735))
        make_face(mode=Mode.SUBTRACT)
    # profile 4 of 4: a face of its own
    with BuildSketch(Plane(origin=(43.00000000000001, 0, 0), x_dir=(0, 0, -1), z_dir=(1, 0, 0)).offset(CUT_EXTRUDE7_START)):
        with BuildLine():
            Line((31.860347110236052, -35.654860472038735), (39.86034711023605, -35.654860472038735))
            ThreePointArc((39.86034711023605, -35.654860472038735), (42.86034711023605, -38.65486047203874), (39.86034711023605, -41.65486047203874))
            Line((39.86034711023605, -41.65486047203874), (31.860347110236052, -41.65486047203874))
            ThreePointArc((31.860347110236052, -41.65486047203874), (28.860347110236045, -38.65486047203874), (31.860347110236052, -35.654860472038735))
        make_face()
        with BuildLine():
            Line((39.86034711023605, -36.90486047203874), (31.860347110236038, -36.90486047203874))
            ThreePointArc((31.860347110236038, -36.90486047203874), (30.110347110236052, -38.65486047203874), (31.860347110236038, -40.40486047203874))
            Line((31.860347110236038, -40.40486047203874), (39.86034711023605, -40.40486047203874))
            ThreePointArc((39.86034711023605, -40.40486047203874), (41.61034711023605, -38.65486047203874), (39.86034711023605, -36.90486047203874))
        make_face(mode=Mode.SUBTRACT)
    extrude(amount=CUT_EXTRUDE7_DEPTH, mode=Mode.SUBTRACT)

    # Sketch12 → Boss-Extrude5 (add)
    with BuildSketch(Plane.XZ.offset(8).offset(BOSS_EXTRUDE5_START)):
        with BuildLine():
            Line((-3, -11.618950038622252), (-3, -34.8711915483254))
            ThreePointArc((-3, -34.8711915483254), (2.14e-15, -35.00000000000001), (3, -34.8711915483254))
            Line((3, -34.8711915483254), (3, -11.618950038622252))
            ThreePointArc((3, -11.618950038622252), (7.3e-16, -12.000000000000002), (-3, -11.618950038622252))
        make_face()
    extrude(amount=-BOSS_EXTRUDE5_DEPTH)

    # Chamfer4
    chamfer4_edges = [part.edges().sort_by_distance(p)[0] for p in [
        (4.4e-16, -44, -35),
    ]]
    chamfer4_side = [part.faces().sort_by_distance(p)[0] for p in [
        (10.41921121396124, -44, 1.5648503283052186),
    ]]
    chamfer(chamfer4_edges, length=CHAMFER4_SIZE, length2=CHAMFER4_SIZE2, reference=chamfer4_side[0])

    # Sketch13 → Cut-Extrude8 (cut)
    with BuildSketch(Plane(origin=(0, 2, 0), x_dir=(1, 0, 0), z_dir=(0, 1, 0))):
        with Locations(Location((0, 20, 0), (0, 0, 270))):
            Circle(SKETCH13_R)
        with Locations(Location((20, -6.983e-14, 0), (0, 0, 270))):
            Circle(SKETCH13_R)
        with Locations(Location((-1.3966e-13, -20, 0), (0, 0, 270))):
            Circle(SKETCH13_R)
        with Locations(Location((-19.999999999999996, 2.0949e-13, 0), (0, 0, 270))):
            Circle(SKETCH13_R)
    extrude(amount=-CUT_EXTRUDE8_DEPTH, mode=Mode.SUBTRACT)

    # Sketch14 → Cut-Extrude9 (cut)
    with BuildSketch(Plane(origin=(0, 2, 0), x_dir=(1, 0, 0), z_dir=(0, 1, 0))):
        with Locations(Location((14.142135623730923, 14.142135623730976, 0), (0, 0, 270))):
            Circle(SKETCH14_R)
        with Locations(Location((14.142135623730928, -14.14213562373097, 0), (0, 0, 270))):
            Circle(SKETCH14_R_2)
        with Locations(Location((-14.142135623731019, -14.142135623730875, 0), (0, 0, 270))):
            Circle(SKETCH14_R)
        with Locations(Location((-14.14213562373083, 14.14213562373107, 0), (0, 0, 270))):
            Circle(SKETCH14_R)
    extrude(amount=-CUT_EXTRUDE9_DEPTH, mode=Mode.SUBTRACT)

    # Sketch15 → Cut-Extrude10 (cut)
    with SkipClean():  # the faces are left unmerged after this step: merging them gives an invalid solid
        with BuildSketch(Plane.XZ.offset(44)):
            Polygon((-1.73e-15, 7.505553499465134), (-6.499999999999999, 3.752776749732567), (-6.499999999999997, -3.752776749732569), (1.07e-15, -7.505553499465135), (6.500000000000001, -3.7527767497325675), (6.499999999999998, 3.7527767497325697), align=None)
        extrude(amount=-CUT_EXTRUDE10_DEPTH, mode=Mode.SUBTRACT)

    # Sketch16 → Boss-Extrude6 (add)
    with SkipClean():  # the faces are left unmerged after this step: merging them gives an invalid solid
        with BuildSketch(Plane(origin=(0, 0, 0), x_dir=(-1, 0, 0), z_dir=(0, 0, -1))):
            with Locations((-39.00000000000001, -4)):
                Rectangle(SKETCH16_W, SKETCH16_H)
        extrude(amount=BOSS_EXTRUDE6_DEPTH)

    # Chamfer5
    # the kernel refuses this chamfer: 8 mm, written as the material it takes off along each edge
    with BuildSketch(Plane(origin=(14.42653609627272, 0, -5), x_dir=(0, 0.027495876610586365, 0.9996219169112968), z_dir=(1, 0, 0))) as chamfer5_piece_1_section:
        Polygon((CHAMFER5_SIZE * 0.999621916911, CHAMFER5_SIZE * 0.0274958766106), (-CHAMFER5_SIZE * 0.0274958766106, CHAMFER5_SIZE * 0.999621916911), (0, 0), align=None)
    chamfer5_piece_1 = extrude(amount=49.146927807454574, mode=Mode.PRIVATE)
    chamfer5_piece_1 = chamfer5_piece_1 - Plane(origin=(1.78e-15, -0.5998737584279192, 0), x_dir=(1, 0, 0), z_dir=(0, -1, 0)) * Cylinder(35.00000000000001, 131, mode=Mode.PRIVATE)
    add(chamfer5_piece_1, mode=Mode.SUBTRACT)

    # Sketch17 → Cut-Extrude11 (cut)
    with BuildSketch(Plane.ZY.offset(-35.00000000000003)):
        with BuildLine():
            Line((-26.860347110236045, -14.654860472038743), (-18.860347110236045, -14.654860472038743))
            ThreePointArc((-18.860347110236045, -14.654860472038743), (-7.8603471102360345, -25.654860472038738), (-18.860347110236045, -36.65486047203875))
            Line((-18.860347110236045, -36.65486047203875), (-26.86034711023604, -36.65486047203875))
            ThreePointArc((-26.86034711023604, -36.65486047203875), (-37.86034711023604, -25.654860472038738), (-26.860347110236045, -14.654860472038743))
        make_face()
    extrude(amount=-CUT_EXTRUDE11_DEPTH, mode=Mode.SUBTRACT)


solid = part.part
